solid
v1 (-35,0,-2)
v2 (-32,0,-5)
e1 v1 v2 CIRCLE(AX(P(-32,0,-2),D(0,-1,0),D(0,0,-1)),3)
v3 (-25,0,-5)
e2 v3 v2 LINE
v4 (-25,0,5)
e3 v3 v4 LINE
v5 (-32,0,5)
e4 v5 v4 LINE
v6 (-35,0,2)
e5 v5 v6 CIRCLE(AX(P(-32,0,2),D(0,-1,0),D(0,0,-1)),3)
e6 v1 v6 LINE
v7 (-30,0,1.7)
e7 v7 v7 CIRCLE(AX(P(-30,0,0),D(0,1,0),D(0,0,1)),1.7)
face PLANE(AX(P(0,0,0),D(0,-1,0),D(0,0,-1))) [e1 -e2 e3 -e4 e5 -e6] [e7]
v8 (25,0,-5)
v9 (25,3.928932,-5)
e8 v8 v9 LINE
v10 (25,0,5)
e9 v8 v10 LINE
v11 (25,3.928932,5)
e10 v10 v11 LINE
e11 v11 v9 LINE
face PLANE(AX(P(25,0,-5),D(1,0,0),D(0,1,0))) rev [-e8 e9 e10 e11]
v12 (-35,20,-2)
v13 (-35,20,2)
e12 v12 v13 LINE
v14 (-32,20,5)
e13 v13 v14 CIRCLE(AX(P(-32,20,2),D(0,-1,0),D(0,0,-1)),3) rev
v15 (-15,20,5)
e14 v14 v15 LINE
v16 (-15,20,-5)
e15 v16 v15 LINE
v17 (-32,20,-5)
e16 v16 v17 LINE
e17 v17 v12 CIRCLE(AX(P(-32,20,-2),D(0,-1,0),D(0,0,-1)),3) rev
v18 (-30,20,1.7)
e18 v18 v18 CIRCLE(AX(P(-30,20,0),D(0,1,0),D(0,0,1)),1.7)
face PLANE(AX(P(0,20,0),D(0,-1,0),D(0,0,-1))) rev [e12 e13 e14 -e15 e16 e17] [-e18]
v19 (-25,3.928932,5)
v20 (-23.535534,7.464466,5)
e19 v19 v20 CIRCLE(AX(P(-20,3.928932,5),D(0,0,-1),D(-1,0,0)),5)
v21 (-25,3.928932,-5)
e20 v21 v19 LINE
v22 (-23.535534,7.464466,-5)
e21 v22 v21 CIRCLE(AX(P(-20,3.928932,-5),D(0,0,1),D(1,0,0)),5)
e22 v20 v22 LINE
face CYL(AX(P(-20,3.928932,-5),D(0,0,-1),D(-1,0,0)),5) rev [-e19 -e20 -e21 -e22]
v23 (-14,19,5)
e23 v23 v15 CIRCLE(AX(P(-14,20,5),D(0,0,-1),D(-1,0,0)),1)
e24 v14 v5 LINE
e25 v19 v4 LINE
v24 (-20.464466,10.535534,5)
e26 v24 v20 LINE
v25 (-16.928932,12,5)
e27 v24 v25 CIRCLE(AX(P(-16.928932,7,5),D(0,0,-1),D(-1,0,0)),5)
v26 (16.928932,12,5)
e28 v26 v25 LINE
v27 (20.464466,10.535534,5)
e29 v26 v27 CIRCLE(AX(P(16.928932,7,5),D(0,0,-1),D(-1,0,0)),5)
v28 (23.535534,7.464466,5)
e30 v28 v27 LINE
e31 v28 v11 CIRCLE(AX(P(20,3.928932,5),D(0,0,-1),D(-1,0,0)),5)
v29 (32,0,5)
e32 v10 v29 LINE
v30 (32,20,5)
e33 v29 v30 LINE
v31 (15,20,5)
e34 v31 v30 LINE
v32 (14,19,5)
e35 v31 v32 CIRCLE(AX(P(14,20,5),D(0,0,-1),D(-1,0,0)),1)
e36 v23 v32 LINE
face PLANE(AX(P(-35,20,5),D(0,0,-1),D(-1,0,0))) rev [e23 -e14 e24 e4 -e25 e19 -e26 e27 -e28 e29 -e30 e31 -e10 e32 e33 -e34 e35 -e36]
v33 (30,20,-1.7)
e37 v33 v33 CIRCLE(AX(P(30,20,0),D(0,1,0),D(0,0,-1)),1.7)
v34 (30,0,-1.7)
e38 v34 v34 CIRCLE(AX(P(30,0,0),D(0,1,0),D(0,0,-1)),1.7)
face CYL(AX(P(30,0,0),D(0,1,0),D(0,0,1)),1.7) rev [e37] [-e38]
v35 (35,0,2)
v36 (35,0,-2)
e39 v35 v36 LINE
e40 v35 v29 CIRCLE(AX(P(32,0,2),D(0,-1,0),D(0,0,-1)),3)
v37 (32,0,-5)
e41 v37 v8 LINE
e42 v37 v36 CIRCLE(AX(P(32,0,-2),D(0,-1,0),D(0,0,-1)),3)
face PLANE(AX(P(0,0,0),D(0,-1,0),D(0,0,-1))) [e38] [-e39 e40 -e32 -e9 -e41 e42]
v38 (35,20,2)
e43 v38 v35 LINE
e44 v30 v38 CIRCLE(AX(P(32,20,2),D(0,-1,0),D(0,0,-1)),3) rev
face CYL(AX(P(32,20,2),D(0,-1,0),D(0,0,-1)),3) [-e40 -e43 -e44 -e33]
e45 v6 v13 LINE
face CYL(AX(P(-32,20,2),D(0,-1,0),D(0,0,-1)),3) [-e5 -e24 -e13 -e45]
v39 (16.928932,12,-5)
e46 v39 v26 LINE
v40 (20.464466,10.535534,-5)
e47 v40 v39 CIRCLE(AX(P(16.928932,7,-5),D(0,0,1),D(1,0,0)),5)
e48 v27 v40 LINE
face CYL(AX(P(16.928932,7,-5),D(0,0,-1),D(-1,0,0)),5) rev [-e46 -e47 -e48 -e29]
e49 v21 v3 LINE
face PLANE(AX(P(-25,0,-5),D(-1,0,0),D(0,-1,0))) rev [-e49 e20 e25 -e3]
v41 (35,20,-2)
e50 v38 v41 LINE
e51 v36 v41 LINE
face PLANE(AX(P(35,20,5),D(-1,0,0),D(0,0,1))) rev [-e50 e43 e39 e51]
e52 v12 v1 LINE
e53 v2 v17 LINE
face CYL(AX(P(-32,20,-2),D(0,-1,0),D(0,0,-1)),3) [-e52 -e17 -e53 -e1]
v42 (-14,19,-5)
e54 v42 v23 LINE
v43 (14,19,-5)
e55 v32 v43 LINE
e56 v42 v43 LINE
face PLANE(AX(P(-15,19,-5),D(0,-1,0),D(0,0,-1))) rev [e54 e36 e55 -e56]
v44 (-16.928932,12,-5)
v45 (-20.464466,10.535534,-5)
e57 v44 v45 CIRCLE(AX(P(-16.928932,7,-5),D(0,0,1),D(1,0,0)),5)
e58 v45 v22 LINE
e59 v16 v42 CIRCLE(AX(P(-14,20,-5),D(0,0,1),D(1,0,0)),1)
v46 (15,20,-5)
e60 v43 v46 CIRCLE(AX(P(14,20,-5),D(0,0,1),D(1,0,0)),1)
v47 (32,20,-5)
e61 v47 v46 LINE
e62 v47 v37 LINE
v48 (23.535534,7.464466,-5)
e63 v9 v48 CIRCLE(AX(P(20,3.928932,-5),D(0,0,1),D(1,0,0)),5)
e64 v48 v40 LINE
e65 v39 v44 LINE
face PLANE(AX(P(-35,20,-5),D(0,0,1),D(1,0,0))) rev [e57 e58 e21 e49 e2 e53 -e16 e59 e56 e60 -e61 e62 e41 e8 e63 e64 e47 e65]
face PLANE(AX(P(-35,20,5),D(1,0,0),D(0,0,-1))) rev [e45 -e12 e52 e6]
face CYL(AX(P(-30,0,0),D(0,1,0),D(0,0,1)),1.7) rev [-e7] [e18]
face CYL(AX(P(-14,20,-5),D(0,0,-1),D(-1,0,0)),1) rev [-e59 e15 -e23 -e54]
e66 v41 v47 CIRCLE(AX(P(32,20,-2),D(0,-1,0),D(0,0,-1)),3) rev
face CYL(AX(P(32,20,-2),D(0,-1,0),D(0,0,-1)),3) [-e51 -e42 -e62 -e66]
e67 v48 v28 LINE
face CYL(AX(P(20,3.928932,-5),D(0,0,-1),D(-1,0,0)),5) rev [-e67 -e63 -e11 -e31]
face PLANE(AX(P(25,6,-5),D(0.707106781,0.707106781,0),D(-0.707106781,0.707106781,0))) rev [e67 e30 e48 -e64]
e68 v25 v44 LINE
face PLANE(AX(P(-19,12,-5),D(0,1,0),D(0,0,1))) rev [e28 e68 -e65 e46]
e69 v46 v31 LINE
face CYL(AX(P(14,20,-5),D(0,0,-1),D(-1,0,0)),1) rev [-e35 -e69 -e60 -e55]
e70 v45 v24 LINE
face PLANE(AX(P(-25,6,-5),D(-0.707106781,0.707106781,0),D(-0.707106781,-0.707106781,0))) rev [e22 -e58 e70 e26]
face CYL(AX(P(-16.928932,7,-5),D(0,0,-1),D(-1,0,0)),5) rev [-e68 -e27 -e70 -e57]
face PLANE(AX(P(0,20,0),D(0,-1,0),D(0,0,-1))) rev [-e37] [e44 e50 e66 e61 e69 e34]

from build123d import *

# Parameters (mm, degrees)
SKETCH_1_W          = 70
SKETCH_1_H          = 10
EXTRUDE_1_DEPTH     = 20
SKETCH_2_R          = 1.7
CUT_EXTRUDE_1_DEPTH = 20
SKETCH_3_W          = 30
SKETCH_3_H          = 1
CUT_EXTRUDE_2_DEPTH = 10
FILLET_1_R          = 5
FILLET_2_R          = 3
FILLET_3_R          = 1


with BuildPart() as part:
    # 草图1 → 凸台-拉伸1 (new body)
    with BuildSketch(Plane(origin=(0, 0, 0), x_dir=(1, 0, 0), z_dir=(0, 1, 0))):
        Rectangle(SKETCH_1_W, SKETCH_1_H)
    extrude(amount=EXTRUDE_1_DEPTH)

    # 草图2 → 切除-拉伸1 (cut)
    with BuildSketch(Plane(origin=(0, 20, 0), x_dir=(1, 0, 0), z_dir=(0, 1, 0))):
        with Locations(Location((-30, 0, 0), (0, 0, 270))):
            Circle(SKETCH_2_R)
        with Locations(Location((30, 0, 0), (0, 0, 90))):
            Circle(SKETCH_2_R)
    extrude(amount=-CUT_EXTRUDE_1_DEPTH, mode=Mode.SUBTRACT)

    # 草图3 → 切除-拉伸2 (cut)
    with BuildSketch(Plane.XY.offset(5)):
        Polygon((-25, 0), (25, 0), (25, 6), (19, 12), (-19, 12), (-25, 6), align=None)
        with Locations((0, 19.5)):
            Rectangle(SKETCH_3_W, SKETCH_3_H)
    extrude(amount=-CUT_EXTRUDE_2_DEPTH, mode=Mode.SUBTRACT)

    # 圆角1
    fillet_1_edges = [part.edges().sort_by_distance(p)[0] for p in [
        (-25, 6, 0),
        (-19, 12, 0),
        (19, 12, 0),
        (25, 6, 0),
    ]]
    fillet(fillet_1_edges, radius=FILLET_1_R)

    # 圆角2
    fillet_2_edges = [part.edges().sort_by_distance(p)[0] for p in [
        (35, 10, 5),
        (-35, 10, 5),
        (-35, 10, -5),
        (35, 10, -5),
    ]]
    fillet(fillet_2_edges, radius=FILLET_2_R)

    # 圆角3
    fillet_3_edges = [part.edges().sort_by_distance(p)[0] for p in [
        (15, 19, 0),
        (-15, 19, 0),
    ]]
    fillet(fillet_3_edges, radius=FILLET_3_R - 0.0001)  # a hair under: the kernel refuses the full size


solid = part.part
